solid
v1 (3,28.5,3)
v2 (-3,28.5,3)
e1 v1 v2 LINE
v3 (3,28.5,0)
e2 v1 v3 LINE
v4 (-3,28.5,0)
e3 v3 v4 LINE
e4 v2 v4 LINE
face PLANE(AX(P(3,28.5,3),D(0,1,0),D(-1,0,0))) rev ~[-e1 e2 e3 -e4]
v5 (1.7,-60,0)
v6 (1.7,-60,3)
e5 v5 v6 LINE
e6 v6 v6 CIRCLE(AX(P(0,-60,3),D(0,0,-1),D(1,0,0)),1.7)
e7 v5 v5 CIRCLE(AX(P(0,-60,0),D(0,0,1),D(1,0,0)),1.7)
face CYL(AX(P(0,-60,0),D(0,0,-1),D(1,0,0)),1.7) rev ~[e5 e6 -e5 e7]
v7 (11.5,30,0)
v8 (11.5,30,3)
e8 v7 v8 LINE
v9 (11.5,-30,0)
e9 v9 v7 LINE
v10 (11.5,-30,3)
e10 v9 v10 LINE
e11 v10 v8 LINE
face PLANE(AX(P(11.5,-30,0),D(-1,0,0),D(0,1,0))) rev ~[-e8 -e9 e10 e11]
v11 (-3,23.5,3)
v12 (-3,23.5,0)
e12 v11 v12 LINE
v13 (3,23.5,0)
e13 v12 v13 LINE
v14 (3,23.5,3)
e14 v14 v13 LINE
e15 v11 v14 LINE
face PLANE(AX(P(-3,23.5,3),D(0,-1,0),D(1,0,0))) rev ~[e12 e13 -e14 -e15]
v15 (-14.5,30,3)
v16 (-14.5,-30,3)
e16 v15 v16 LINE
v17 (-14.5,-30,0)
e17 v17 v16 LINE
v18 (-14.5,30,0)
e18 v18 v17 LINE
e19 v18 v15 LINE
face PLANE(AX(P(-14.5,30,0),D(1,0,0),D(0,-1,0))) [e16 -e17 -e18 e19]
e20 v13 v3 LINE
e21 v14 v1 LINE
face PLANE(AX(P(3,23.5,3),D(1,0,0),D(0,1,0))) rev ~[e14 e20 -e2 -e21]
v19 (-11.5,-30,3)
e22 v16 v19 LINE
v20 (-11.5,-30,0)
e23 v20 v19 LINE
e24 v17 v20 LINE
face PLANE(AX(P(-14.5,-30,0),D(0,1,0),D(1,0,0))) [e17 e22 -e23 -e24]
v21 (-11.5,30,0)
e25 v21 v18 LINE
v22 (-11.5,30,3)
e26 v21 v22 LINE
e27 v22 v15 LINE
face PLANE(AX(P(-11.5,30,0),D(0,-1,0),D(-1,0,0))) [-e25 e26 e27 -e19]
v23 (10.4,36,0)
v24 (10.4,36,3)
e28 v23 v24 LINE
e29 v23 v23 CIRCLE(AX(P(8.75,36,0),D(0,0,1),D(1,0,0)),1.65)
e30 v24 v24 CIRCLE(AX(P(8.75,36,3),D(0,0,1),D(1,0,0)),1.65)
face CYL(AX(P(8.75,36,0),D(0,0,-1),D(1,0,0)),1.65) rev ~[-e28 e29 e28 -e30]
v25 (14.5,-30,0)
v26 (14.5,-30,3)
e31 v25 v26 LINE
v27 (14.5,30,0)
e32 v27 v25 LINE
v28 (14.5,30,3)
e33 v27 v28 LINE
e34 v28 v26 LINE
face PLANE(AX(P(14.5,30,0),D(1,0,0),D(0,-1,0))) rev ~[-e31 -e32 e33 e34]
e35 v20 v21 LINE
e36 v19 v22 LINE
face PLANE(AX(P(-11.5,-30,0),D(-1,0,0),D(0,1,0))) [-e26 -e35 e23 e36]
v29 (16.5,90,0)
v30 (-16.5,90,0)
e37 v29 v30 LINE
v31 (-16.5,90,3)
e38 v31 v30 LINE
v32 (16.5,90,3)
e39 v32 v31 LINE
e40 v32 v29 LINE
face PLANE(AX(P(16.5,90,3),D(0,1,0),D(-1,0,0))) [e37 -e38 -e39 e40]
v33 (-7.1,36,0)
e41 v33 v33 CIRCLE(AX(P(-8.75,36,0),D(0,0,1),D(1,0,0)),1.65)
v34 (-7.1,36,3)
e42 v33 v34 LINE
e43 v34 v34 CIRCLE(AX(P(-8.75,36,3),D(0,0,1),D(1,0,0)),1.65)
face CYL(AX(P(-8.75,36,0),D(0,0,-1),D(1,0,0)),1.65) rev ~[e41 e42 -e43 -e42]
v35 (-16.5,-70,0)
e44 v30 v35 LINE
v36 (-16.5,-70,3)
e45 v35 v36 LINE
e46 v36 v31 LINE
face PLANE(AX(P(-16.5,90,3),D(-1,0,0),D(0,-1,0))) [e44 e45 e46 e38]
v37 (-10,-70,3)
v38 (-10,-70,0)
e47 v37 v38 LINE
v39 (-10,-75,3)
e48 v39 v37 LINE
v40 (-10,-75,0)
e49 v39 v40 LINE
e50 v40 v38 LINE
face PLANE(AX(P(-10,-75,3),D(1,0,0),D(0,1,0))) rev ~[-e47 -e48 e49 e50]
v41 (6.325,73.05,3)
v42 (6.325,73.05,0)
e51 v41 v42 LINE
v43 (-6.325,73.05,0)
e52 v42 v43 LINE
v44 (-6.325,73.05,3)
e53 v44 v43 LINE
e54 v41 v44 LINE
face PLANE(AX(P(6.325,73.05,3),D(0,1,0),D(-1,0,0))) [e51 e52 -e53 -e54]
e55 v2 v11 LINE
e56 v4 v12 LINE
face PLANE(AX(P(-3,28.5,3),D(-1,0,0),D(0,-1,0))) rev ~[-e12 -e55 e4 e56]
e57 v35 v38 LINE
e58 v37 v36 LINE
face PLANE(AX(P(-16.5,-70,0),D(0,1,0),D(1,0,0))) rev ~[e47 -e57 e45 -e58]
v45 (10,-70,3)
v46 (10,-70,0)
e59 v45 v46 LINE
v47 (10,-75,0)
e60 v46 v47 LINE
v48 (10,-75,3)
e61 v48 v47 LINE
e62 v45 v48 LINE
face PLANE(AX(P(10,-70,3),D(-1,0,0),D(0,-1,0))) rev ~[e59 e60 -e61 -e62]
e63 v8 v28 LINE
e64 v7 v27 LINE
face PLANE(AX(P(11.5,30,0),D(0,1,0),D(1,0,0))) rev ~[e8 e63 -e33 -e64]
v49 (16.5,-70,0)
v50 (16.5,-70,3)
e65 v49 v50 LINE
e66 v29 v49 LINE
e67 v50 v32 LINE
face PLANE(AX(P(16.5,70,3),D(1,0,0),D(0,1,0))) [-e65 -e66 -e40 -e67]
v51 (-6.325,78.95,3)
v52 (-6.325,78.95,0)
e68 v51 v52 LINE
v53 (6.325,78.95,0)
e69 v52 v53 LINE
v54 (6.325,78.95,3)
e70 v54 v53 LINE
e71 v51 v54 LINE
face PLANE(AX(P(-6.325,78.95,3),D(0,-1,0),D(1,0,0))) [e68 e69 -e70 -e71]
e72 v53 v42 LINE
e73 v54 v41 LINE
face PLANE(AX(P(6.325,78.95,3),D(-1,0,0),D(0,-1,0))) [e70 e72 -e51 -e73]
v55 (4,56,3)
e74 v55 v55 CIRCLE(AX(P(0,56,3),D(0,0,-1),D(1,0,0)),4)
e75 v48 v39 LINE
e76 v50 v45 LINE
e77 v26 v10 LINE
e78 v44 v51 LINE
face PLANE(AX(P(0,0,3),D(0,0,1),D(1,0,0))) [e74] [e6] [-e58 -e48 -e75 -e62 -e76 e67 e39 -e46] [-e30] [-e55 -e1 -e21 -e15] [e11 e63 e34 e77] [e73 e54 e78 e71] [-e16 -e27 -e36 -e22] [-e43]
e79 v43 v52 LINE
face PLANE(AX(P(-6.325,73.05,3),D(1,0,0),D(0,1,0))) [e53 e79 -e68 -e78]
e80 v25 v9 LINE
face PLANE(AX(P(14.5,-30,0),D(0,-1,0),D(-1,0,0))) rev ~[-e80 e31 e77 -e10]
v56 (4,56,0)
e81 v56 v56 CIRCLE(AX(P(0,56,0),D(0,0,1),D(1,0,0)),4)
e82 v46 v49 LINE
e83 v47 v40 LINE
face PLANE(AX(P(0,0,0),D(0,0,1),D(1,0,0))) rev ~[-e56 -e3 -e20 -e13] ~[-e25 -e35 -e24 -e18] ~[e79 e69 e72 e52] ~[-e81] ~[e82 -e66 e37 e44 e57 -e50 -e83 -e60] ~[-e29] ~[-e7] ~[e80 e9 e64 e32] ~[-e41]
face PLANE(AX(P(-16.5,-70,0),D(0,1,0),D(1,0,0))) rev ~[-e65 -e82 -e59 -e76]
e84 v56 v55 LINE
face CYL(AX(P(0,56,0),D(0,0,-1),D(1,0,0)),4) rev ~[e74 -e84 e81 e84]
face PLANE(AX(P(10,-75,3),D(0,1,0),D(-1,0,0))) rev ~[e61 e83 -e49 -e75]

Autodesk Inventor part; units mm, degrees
ref_plane "YZ Plane" through (0, 0, 0) normal (1, 0, 0) x (0, 1, 0)
ref_plane "XZ Plane" through (0, 0, 0) normal (0, 1, 0) x (-1, 0, 0)
ref_plane "XY Plane" through (0, 0, 0) normal (0, 0, 1) x (1, 0, 0)
sketch "Sketch1" plane through (0, 0, 0) normal (0, 0, 1) x (1, 0, 0)
  line L0 (-16.5, -70) -> (16.5, -70)
  line L1 (16.5, -70) -> (16.5, 70)
  line L2 (16.5, 70) -> (-16.5, 70)
  line L3 (-16.5, 70) -> (-16.5, -70)
  line L4 (-16.5, -70) -> (16.5, 70) construction
  line L5 (16.5, -70) -> (-16.5, 70) construction
  line L6 (0, 70) -> (0, -70)
  line L7 (11.5, 30) -> (14.5, 30)
  line L8 (14.5, 30) -> (14.5, -30)
  line L9 (14.5, -30) -> (11.5, -30)
  line L10 (11.5, -30) -> (11.5, 30)
  line L11 (-11.5, 30) -> (-14.5, 30)
  line L12 (-14.5, -30) -> (-11.5, -30)
  line L13 (-14.5, 30) -> (-14.5, -30)
  line L14 (-11.5, -30) -> (-11.5, 30)
  circle A0 centre (0, -60) radius 1.7
  circle A1 centre (0, 56) radius 10
  line L15 (-10, 56) -> (10, 56)
  line L16 (-6.3196, 63.75) -> (6.3196, 63.75)
  line L17 (-6.3196, 48.25) -> (6.3196, 48.25)
  circle A2 centre (8.75, 36) radius 1.65
  circle A3 centre (-8.75, 36) radius 1.65
  circle A4 centre (0, 56) radius 4
  point P0 (0, 0)
  point P1 (0, 0)
  point P2 (14.5, 0)
  point P3 (16.5, 0)
  point P4 (-14.5, 0)
  point P5 (0, 0)
  point P6 (-6.3196, 48.25)
  point P7 (6.3196, 48.25)
  dimension "d0" = 140
  dimension "d1" = 3
  dimension "d2" = 2
  dimension "d3" = 60
  dimension "d6" = 3.4
  dimension "d7" = 10
  dimension "d9" = 23
  dimension "d13" = 14
  dimension "d14" = 20
  dimension "d15" = 15.5
  dimension "d17" = 3.3
  dimension "d18" = 20
  dimension "d19" = 17.5
  dimension "d22" = 8
extrude "Plate1" add sketch "Sketch1" along normal blind 3 contours L3 L2 L6 A1 A0 L0 | L6 A0 A1 L2 L1 L0 | A1 L16 L6 | L6 L16 A1 | A1 L17 L6 | L6 L17 A1 | L16 A1 L15 A4 L6 | L6 A4 L15 A1 L16 | L17 A1 L15 A4 L6 | L6 A4 L15 A1 L17
sketch "Sketch3" plane through (0, 0, 3) normal (0, 0, 1) x (1, 0, 0)
  line L0 (-16.5, 70) -> (-16.5, -70)
  line L1 (-16.5, 70) -> (16.5, 70)
  line L2 (16.5, 70) -> (16.5, 90)
  line L3 (16.5, 90) -> (-16.5, 90)
  line L4 (-16.5, 90) -> (-16.5, 70)
  line L5 (-16.5, 0) -> (16.5, 0)
  line L6 (16.5, -70) -> (16.5, 70)
  point P0 (0, 0)
  dimension "d23" = 20
sheet face with bend "Face2" sketch "Sketch3" thickness 3 toward (0, 0, -1) bend radius 3 contours L4 L3 L2 L1
bend "Bend1"
sketch "Sketch4" plane through (0, 0, 3) normal (0, 0, 1) x (1, 0, 0)
  line L0 (-10, -70) -> (10, -70)
  line L1 (10, -70) -> (10, -75)
  line L2 (10, -75) -> (-10, -75)
  line L3 (-10, -75) -> (-10, -70)
  line L4 (16.5, -70) -> (-16.5, -70)
  point P0 (0, 0)
  point P1 (0, -70)
  point P2 (0, -70)
  point P3 (0, -70)
  dimension "d29" = 20
  dimension "d30" = 5
sheet face with bend "Face3" sketch "Sketch4" thickness 3 toward (0, 0, -1) bend radius 3
bend "Bend2"
sketch "Sketch5" plane through (0, 0, 3) normal (0, 0, 1) x (1, 0, 0)
  line L0 (-3, 23.5) -> (3, 23.5)
  line L1 (3, 23.5) -> (3, 28.5)
  line L2 (3, 28.5) -> (-3, 28.5)
  line L3 (-3, 28.5) -> (-3, 23.5)
  line L4 (-3, 23.5) -> (3, 28.5) construction
  line L5 (3, 23.5) -> (-3, 28.5) construction
  circle A0 centre (0, 56) radius 4 projected
  point P0 (0, 0)
  point P1 (0, 26)
  dimension "d36" = 6
  dimension "d37" = 5
  dimension "d38" = 30
extrude "Cut1" cut sketch "Sketch5" against normal blind 3 contours L3 L2 L1 L0
sketch "Sketch6" plane through (0, 0, 3) normal (0, 0, 1) x (1, 0, 0)
  line L0 (-6.325, 78.95) -> (6.325, 78.95)
  line L1 (6.325, 78.95) -> (6.325, 73.05)
  line L2 (6.325, 73.05) -> (-6.325, 73.05)
  line L3 (-6.325, 73.05) -> (-6.325, 78.95)
  line L4 (-6.325, 78.95) -> (6.325, 73.05) construction
  line L5 (6.325, 78.95) -> (-6.325, 73.05) construction
  circle A0 centre (0, 56) radius 4 projected
  point P0 (0, 0)
  point P1 (0, 76)
  dimension "d41" = 12.65
  dimension "d42" = 5.9
  dimension "d43" = 20
extrude "Cut2" cut sketch "Sketch6" against normal blind 3 contours L0 L1 L2 L3
equation "\"d39\" = Thickness"
equation "\"d44\" = Thickness"
equation "\"d16\" = Thickness"
equation "\"d24\" = BendRadius"
equation "\"d25\" = BendReliefWidth"
equation "\"d27\" = MinimumRemnant"
equation "\"d26\" = BendReliefDepth"
equation "\"d28\" = TransitionRadius"
equation "\"d31\" = BendRadius"
equation "\"d32\" = BendReliefWidth"
equation "\"d34\" = MinimumRemnant"
equation "\"d33\" = BendReliefDepth"
equation "\"d35\" = TransitionRadius"
equation "\"BendRadius\" = Thickness"
equation "\"BendReliefWidth\" = Thickness"
equation "\"BendReliefDepth\" = 0.5 * Thickness"
equation "\"CornerReliefSize\" = 4 * Thickness"
equation "\"MinimumRemnant\" = 2 * Thickness"
equation "\"TransitionRadius\" = BendRadius"
equation "\"JacobiRadiusSize\" = BendRadius"
equation "\"GapSize\" = Thickness"
equation "\"Thickness\" = 3"
properties part number "Motor Fixation .1 FV"
